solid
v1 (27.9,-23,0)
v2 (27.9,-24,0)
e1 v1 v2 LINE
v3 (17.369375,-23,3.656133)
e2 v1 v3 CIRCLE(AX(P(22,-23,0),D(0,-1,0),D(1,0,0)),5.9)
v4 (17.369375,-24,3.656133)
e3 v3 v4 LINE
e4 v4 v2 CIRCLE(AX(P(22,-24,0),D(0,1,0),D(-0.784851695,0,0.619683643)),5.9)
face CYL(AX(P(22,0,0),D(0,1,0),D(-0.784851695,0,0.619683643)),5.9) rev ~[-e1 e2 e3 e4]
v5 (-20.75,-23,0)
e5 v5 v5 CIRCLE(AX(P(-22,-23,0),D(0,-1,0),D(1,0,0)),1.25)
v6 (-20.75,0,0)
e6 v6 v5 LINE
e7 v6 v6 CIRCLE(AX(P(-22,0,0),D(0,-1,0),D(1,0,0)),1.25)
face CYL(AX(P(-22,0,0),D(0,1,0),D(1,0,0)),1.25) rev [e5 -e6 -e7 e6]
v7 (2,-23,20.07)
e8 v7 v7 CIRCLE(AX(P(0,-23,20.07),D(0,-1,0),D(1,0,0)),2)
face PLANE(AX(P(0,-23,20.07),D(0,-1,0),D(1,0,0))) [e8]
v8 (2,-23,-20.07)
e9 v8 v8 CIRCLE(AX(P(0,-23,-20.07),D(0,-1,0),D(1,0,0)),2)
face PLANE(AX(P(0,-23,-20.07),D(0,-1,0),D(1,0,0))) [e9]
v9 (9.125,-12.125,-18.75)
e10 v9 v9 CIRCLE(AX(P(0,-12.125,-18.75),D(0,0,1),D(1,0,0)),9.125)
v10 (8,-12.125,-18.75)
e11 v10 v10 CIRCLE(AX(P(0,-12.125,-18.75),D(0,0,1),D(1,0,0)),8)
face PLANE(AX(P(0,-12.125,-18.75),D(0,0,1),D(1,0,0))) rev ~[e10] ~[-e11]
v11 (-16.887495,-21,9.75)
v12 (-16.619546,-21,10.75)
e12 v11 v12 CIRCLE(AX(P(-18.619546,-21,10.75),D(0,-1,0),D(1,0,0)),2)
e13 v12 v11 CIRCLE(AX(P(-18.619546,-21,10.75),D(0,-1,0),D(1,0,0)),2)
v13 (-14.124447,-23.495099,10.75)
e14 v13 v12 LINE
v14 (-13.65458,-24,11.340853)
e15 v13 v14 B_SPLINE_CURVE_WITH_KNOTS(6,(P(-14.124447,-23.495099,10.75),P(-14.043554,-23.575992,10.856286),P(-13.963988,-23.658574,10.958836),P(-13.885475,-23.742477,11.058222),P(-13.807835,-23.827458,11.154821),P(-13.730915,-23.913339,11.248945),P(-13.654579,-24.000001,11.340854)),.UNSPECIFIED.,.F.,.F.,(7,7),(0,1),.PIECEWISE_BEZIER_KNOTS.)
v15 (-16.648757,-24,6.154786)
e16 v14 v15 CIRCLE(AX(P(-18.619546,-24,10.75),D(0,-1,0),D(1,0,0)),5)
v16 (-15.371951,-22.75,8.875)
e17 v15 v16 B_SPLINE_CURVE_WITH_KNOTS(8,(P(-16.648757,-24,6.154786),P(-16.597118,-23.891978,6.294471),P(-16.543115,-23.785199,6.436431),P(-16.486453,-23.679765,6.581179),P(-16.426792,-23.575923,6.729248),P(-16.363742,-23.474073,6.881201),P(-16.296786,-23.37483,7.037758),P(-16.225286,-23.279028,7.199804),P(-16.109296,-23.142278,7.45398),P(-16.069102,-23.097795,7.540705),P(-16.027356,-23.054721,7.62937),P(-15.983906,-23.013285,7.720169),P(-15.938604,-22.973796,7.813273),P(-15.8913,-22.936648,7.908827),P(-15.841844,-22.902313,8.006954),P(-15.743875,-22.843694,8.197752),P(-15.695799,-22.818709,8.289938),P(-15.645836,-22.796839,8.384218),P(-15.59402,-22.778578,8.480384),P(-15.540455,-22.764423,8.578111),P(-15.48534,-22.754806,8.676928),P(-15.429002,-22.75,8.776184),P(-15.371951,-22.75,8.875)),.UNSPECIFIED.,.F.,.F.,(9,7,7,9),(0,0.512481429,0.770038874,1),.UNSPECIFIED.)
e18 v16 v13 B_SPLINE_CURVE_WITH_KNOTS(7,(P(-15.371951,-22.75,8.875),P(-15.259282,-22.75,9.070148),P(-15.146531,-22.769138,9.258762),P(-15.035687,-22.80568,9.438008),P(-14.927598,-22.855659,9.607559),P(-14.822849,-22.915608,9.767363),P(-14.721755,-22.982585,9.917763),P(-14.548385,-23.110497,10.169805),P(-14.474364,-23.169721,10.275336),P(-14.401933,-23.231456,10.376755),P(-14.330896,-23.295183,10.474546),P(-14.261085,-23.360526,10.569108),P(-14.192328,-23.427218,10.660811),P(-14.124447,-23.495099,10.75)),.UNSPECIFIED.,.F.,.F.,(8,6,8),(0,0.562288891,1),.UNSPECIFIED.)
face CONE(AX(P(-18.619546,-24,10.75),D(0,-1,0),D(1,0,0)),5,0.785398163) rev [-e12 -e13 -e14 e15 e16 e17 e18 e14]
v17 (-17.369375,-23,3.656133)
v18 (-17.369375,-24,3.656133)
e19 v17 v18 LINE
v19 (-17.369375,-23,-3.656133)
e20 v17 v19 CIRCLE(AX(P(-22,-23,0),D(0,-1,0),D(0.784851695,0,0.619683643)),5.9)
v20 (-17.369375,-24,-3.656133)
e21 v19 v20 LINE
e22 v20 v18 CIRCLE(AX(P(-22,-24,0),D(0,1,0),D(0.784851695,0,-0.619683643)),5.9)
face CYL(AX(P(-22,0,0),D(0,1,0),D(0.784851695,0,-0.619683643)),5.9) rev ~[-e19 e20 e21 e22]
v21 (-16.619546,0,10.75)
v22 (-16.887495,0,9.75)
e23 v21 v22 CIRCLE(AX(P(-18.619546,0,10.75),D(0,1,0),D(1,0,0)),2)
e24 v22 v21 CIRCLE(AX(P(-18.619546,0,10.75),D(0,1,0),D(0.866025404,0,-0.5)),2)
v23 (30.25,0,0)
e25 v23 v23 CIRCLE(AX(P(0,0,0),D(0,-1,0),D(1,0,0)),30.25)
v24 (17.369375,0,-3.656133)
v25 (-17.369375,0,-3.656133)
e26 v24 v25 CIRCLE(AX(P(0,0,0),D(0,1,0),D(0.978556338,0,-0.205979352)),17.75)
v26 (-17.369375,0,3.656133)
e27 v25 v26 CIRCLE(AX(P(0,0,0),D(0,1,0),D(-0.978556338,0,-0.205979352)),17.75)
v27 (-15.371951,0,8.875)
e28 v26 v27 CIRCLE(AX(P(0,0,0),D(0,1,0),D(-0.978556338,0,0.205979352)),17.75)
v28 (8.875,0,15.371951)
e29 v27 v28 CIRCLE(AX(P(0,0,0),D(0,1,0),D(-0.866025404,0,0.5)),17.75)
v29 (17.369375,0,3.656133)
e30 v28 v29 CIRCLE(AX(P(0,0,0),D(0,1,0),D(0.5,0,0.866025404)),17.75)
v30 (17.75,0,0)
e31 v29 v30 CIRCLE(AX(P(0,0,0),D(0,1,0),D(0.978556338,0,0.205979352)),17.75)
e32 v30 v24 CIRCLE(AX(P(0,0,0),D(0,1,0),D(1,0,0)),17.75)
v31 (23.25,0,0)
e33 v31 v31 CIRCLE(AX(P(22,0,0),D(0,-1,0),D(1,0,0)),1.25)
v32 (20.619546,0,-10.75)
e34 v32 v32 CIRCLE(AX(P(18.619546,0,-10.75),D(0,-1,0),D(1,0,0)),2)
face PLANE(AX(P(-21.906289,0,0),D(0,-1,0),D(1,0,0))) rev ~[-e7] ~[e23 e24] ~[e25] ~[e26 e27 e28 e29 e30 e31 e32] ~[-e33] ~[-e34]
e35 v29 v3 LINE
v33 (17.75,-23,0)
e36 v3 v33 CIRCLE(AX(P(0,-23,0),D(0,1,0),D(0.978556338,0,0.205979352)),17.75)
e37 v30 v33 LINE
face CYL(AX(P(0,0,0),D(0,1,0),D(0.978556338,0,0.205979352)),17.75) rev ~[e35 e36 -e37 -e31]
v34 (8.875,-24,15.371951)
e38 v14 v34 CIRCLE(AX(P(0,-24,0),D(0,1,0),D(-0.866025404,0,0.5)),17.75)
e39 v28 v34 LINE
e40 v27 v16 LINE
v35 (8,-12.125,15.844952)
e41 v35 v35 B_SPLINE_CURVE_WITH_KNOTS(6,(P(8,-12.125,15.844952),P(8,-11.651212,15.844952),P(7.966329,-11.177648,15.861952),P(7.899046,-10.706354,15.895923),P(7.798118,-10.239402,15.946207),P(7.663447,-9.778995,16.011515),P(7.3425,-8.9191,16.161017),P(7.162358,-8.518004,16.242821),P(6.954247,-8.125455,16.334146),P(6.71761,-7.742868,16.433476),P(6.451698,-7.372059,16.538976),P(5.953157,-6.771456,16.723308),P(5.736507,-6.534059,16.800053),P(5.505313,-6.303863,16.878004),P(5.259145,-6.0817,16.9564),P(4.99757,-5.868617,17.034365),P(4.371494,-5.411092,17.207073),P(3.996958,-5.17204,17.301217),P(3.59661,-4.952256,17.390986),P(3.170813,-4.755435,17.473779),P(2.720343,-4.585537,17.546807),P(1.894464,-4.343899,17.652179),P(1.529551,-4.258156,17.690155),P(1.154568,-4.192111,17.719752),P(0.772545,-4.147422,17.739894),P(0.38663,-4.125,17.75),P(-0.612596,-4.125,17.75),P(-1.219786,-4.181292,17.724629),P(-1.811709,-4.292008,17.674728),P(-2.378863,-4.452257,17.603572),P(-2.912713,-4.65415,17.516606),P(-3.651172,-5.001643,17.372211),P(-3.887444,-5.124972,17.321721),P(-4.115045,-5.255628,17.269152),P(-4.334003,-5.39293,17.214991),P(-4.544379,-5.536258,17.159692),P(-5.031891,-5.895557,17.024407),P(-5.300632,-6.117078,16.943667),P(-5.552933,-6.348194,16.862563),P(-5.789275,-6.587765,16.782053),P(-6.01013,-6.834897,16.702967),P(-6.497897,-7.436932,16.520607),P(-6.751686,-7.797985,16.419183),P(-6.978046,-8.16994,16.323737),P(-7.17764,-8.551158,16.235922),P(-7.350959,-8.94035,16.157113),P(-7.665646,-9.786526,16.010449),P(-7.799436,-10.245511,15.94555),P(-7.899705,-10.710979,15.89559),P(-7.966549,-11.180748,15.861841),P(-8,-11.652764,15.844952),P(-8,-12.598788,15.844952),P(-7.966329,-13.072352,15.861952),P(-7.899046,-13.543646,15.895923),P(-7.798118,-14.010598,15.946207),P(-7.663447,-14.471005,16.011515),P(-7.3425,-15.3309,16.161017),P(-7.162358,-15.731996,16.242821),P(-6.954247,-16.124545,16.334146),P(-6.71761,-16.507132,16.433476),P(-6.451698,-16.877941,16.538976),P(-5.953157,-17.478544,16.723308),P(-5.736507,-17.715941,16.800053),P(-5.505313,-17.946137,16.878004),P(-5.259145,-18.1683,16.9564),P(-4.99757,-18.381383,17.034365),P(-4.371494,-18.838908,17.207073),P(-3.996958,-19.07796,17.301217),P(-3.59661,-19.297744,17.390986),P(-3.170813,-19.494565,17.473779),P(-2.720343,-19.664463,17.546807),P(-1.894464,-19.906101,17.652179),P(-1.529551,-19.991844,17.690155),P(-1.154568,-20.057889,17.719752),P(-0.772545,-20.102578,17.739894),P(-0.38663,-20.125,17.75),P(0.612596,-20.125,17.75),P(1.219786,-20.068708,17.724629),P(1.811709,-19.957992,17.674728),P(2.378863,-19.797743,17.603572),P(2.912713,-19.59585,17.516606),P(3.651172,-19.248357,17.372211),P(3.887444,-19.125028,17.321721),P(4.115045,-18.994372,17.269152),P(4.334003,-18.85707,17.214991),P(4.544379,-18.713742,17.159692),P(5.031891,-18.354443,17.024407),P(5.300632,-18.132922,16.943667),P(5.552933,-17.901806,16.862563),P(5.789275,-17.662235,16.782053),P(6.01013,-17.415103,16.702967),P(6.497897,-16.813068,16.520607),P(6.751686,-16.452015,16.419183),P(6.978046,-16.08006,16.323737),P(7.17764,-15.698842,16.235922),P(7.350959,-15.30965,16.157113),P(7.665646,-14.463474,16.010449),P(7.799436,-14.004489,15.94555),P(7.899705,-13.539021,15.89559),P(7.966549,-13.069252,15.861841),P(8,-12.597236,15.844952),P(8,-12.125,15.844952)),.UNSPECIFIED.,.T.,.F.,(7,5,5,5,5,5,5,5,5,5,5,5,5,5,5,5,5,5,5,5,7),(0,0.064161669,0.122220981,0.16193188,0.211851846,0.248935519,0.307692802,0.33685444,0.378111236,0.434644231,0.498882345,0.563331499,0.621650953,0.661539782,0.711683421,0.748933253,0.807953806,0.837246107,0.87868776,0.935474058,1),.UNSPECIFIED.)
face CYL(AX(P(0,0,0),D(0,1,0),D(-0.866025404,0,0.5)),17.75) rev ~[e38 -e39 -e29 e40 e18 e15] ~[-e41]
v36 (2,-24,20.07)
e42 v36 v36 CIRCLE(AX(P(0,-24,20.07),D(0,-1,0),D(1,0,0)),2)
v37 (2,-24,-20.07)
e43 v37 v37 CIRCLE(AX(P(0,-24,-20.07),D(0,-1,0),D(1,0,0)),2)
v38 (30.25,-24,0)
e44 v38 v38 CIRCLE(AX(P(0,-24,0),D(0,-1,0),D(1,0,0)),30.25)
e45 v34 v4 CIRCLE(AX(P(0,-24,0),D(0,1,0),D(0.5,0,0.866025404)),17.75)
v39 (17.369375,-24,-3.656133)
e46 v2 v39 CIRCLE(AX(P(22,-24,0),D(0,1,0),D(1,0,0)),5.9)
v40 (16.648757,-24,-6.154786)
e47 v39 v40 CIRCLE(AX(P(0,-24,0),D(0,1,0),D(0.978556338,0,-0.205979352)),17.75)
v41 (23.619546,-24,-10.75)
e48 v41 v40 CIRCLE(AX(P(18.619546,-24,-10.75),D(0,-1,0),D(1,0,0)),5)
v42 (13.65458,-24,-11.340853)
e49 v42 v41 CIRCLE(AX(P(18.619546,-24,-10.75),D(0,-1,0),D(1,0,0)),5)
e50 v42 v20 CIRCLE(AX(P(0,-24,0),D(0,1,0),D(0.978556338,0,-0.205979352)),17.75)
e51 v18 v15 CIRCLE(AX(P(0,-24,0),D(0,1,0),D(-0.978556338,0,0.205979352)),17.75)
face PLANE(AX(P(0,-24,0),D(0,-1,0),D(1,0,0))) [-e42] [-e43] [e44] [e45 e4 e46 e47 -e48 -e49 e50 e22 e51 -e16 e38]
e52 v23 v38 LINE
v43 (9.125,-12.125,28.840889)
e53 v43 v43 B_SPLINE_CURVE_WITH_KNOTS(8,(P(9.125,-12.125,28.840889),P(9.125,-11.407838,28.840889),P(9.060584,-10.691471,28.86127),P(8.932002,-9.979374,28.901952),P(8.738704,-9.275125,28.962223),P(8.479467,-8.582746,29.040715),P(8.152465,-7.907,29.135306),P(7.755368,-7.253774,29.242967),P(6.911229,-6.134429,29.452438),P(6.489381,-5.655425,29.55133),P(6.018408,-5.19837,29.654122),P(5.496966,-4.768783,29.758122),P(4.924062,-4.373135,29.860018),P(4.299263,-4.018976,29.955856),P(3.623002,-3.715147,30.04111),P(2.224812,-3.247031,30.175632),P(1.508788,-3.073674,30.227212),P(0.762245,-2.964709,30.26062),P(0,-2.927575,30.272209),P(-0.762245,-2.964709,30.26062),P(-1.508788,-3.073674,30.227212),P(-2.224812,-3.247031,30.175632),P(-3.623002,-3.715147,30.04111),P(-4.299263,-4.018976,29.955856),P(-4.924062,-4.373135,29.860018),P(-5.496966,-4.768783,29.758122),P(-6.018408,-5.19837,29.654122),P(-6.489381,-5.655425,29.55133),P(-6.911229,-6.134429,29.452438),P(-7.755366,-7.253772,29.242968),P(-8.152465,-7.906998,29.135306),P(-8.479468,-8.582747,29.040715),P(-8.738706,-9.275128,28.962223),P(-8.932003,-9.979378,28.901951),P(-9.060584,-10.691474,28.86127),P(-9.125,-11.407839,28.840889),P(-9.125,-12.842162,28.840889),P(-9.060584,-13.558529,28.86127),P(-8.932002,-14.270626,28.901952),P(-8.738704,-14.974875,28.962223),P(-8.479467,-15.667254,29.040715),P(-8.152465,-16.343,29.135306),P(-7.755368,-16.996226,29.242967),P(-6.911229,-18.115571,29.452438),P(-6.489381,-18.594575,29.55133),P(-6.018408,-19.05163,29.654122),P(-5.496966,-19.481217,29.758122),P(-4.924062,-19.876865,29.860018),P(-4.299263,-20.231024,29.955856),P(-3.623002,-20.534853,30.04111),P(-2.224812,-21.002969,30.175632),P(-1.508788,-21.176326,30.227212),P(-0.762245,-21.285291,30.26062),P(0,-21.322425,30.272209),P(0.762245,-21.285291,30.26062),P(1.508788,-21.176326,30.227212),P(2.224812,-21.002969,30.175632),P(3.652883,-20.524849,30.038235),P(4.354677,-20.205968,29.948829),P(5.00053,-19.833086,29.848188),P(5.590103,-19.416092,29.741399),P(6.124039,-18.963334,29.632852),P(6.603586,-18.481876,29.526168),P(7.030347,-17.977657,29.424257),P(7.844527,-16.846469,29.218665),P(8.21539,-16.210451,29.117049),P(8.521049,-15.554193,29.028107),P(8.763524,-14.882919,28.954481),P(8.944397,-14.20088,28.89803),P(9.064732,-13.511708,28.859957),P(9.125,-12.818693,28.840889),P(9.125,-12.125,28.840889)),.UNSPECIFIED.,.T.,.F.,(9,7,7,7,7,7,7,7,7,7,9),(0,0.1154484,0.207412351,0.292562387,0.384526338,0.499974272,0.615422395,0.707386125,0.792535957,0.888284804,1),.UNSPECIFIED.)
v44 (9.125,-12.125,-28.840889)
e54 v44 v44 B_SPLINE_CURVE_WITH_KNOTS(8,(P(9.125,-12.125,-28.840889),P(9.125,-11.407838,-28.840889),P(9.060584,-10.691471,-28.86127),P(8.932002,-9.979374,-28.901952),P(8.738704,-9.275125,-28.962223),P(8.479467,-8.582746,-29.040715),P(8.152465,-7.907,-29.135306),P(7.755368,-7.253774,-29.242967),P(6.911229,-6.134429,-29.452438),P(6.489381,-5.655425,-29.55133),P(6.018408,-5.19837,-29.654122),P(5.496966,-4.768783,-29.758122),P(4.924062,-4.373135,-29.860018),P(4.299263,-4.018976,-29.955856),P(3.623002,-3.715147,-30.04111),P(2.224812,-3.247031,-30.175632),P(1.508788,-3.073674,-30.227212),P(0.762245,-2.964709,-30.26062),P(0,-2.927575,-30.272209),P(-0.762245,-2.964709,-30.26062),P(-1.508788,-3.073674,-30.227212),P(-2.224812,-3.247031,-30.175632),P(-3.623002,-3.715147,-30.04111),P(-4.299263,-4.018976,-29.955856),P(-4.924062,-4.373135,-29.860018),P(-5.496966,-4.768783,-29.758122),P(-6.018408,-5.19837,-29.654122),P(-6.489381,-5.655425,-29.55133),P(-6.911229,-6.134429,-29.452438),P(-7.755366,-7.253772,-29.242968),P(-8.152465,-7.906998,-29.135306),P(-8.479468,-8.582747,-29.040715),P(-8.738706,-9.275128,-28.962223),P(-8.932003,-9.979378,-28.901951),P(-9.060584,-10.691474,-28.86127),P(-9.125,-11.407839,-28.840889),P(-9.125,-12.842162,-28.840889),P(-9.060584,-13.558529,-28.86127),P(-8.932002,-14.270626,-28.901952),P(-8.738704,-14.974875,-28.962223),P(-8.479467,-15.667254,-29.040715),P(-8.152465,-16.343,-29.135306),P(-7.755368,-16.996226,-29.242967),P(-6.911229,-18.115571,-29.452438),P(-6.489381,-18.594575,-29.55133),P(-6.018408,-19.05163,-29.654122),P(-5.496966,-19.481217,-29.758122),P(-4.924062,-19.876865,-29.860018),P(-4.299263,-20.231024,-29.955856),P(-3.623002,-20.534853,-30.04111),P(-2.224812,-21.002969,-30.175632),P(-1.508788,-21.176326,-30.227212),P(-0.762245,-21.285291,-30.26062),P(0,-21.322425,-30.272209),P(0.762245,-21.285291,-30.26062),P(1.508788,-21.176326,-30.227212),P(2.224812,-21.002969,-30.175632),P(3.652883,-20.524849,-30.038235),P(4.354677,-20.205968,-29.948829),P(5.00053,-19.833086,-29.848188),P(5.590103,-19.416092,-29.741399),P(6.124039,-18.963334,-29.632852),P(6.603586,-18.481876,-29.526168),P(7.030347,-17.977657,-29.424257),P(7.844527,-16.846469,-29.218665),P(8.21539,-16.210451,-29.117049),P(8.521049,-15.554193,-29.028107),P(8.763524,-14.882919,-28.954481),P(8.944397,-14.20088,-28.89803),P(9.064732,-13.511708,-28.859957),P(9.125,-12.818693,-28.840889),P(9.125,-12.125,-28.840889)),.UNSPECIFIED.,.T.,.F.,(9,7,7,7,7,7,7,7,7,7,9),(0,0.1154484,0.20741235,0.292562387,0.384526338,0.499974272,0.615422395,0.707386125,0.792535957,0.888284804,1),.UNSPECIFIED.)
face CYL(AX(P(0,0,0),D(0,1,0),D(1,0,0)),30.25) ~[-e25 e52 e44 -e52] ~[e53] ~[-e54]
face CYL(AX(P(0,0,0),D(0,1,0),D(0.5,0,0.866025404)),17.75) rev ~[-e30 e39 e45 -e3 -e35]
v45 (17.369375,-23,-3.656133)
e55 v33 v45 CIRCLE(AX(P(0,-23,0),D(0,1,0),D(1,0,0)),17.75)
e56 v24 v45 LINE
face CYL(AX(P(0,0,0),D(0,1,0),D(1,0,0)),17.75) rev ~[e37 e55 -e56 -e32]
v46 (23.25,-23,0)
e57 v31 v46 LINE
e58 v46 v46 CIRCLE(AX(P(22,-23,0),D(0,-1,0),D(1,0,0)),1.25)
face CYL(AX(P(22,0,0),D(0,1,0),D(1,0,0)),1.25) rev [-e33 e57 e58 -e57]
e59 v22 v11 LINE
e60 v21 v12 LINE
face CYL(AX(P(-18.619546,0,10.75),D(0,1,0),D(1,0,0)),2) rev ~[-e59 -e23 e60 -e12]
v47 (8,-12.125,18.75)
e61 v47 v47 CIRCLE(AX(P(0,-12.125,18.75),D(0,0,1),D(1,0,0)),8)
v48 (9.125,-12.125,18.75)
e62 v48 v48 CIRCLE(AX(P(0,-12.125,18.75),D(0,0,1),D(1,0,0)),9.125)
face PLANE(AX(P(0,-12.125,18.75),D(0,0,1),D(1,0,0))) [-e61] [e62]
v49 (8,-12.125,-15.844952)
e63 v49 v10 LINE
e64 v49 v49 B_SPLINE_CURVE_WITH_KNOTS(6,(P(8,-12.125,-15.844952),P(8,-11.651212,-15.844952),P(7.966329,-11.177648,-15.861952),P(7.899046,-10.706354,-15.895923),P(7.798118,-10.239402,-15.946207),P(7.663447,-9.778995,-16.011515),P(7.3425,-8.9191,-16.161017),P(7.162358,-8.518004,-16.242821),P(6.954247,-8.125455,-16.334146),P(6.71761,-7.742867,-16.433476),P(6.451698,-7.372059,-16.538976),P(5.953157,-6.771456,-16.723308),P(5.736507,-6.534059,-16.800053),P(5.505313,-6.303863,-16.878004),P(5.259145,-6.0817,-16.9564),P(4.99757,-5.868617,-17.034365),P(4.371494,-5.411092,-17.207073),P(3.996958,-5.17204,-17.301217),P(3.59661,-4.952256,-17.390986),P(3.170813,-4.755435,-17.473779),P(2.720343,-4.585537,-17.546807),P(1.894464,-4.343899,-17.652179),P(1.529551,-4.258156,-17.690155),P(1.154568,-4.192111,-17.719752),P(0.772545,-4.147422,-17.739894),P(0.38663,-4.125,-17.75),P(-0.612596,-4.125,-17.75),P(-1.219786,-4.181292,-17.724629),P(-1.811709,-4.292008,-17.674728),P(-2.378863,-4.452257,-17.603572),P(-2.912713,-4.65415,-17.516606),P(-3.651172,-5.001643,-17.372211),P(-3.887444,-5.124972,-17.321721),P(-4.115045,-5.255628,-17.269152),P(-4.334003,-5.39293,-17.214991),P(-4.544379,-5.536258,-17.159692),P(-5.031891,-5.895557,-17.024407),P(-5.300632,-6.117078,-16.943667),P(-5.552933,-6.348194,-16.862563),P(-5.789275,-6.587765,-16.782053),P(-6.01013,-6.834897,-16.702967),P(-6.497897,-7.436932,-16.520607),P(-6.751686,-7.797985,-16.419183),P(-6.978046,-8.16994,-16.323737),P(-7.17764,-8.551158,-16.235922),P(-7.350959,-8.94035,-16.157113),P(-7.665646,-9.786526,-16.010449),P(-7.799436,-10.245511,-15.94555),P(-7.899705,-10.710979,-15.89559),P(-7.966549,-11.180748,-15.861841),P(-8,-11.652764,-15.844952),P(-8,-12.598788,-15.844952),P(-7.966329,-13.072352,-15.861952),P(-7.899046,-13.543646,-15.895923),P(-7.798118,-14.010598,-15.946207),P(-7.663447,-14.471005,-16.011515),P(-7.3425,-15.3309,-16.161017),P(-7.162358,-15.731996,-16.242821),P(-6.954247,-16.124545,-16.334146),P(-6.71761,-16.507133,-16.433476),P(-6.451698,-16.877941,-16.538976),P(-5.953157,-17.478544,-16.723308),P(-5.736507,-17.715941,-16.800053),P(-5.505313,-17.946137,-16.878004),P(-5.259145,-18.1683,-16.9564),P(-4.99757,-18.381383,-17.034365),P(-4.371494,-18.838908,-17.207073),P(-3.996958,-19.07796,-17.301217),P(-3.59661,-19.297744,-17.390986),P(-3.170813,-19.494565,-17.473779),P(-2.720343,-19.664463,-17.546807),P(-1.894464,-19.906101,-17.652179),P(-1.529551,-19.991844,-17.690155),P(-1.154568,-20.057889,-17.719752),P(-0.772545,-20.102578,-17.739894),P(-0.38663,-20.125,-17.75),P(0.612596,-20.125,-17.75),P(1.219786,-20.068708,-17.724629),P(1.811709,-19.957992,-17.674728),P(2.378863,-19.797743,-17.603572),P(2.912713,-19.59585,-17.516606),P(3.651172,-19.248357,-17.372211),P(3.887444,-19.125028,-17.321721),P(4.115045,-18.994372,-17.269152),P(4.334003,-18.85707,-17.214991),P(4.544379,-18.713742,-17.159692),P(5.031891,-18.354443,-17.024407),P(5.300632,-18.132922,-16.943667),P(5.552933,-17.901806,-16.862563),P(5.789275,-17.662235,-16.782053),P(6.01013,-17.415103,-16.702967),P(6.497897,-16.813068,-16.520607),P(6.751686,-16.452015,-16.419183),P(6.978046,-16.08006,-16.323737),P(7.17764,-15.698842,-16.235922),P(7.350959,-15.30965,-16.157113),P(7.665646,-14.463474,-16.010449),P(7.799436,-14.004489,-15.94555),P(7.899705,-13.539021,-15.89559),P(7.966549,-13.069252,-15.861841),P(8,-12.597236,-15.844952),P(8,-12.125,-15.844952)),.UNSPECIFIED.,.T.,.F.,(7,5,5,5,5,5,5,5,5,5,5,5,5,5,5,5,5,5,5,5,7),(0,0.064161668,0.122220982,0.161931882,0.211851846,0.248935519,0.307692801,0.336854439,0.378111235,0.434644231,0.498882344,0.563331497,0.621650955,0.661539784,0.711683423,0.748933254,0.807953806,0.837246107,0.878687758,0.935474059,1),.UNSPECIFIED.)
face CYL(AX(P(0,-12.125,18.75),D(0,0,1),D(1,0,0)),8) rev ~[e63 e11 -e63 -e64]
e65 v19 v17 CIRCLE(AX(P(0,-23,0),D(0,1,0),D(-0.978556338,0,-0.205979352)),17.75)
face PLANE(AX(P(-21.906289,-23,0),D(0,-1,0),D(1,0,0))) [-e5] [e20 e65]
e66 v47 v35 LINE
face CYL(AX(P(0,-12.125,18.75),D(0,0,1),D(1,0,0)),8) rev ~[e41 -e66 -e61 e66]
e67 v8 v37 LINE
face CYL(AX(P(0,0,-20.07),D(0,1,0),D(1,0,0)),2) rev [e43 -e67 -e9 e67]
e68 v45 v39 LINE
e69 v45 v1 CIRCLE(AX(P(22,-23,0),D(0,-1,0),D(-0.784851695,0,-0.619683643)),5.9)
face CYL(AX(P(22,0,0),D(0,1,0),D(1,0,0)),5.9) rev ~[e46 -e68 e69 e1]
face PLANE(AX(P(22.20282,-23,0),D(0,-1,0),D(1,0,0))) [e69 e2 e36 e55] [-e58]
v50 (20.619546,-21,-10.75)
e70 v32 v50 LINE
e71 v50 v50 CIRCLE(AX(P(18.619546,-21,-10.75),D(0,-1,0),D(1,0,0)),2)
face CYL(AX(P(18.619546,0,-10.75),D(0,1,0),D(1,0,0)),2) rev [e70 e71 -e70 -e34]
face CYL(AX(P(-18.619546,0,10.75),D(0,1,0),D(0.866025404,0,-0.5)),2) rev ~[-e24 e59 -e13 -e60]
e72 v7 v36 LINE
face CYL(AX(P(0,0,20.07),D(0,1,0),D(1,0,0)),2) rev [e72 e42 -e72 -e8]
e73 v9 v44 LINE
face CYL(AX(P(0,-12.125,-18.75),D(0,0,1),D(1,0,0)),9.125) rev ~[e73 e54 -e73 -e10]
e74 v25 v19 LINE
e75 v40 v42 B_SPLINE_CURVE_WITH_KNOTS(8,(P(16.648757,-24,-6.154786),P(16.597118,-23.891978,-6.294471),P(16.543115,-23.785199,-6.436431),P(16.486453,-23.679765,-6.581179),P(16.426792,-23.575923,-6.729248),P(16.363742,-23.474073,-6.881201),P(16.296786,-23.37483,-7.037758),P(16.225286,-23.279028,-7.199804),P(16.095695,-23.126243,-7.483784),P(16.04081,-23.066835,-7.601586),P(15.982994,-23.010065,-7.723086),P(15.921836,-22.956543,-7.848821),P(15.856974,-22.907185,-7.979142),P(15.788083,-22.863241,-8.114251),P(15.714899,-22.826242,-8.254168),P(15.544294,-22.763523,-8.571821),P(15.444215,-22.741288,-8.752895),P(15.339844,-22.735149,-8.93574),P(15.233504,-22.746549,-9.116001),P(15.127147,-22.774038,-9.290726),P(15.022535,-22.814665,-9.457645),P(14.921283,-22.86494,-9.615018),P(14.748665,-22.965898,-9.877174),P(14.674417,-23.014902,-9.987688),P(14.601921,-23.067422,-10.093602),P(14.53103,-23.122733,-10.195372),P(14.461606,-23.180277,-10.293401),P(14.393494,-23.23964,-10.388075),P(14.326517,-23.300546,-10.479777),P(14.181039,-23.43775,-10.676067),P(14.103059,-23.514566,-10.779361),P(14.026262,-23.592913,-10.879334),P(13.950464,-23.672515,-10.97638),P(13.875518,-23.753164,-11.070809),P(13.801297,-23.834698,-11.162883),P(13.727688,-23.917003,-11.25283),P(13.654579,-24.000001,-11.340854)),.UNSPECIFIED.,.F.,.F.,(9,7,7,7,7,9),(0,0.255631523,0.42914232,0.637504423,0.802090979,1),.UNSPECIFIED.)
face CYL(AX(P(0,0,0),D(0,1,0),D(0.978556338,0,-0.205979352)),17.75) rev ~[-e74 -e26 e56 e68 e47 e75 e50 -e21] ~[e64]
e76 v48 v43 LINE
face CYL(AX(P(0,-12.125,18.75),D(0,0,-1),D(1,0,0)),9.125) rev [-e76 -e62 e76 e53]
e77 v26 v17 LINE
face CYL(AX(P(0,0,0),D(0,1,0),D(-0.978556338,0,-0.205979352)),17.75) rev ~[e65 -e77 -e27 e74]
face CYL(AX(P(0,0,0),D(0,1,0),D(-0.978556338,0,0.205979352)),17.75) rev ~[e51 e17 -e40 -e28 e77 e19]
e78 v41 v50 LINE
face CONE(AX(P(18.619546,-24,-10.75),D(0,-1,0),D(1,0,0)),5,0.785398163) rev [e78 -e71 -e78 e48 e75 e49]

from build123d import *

# Parameters (mm, degrees)
F0_R          = 30.25
F0_R_2        = 2
F1_DEPTH      = 24
F0_R_3        = 1.25
F2_DEPTH      = 23
F5_R          = 9.125
F5_R_2        = 8
F6_DEPTH      = 25
F7_DEPTH      = 60
F7_DEPTH_BACK = 30
F8_START      = -37.5
F8_DEPTH      = 45.7


# Not quite as in the source:
# - a fillet or chamfer that OpenCascade refuses, or shapes differently, is made with other operations: its cross-section is extruded or revolved along the edge and cut away or added


with BuildPart() as f1:
    # F0 (on Front) → F1 (new body)
    with BuildSketch(Plane.XZ):
        Circle(F0_R)
        with Locations((0, -20.07)):
            Circle(F0_R_2, mode=Mode.SUBTRACT)
        with Locations((18.6195461814, -10.75)):
            Circle(F0_R_2, mode=Mode.SUBTRACT)
        with BuildLine():
            ThreePointArc((-16.6195461814, 10.75), (-16.6876945288, 10.2323619098), (-16.8874953738, 9.75))
            ThreePointArc((-16.8874953738, 9.75), (-20.5513978339, 11.2676380902), (-16.6195461814, 10.75))
        make_face(mode=Mode.SUBTRACT)
        with BuildLine():
            ThreePointArc((8.875, 15.3719509172), (14.3703479176, 10.4190019065), (17.369375, 3.6561334917))
            ThreePointArc((17.369375, 3.6561334917), (23.9351114309, 5.5736293158), (27.9, 0))
            ThreePointArc((27.9, 0), (23.9351114309, -5.5736293158), (17.369375, -3.6561334917))
            ThreePointArc((17.369375, -3.6561334917), (0, -17.75), (-17.369375, -3.6561334917))
            ThreePointArc((-17.369375, -3.6561334917), (-27.9, 0), (-17.369375, 3.6561334917))
            ThreePointArc((-17.369375, 3.6561334917), (-16.5773263107, 6.3446632999), (-15.3719509172, 8.875))
            ThreePointArc((-15.3719509172, 8.875), (-4.5940380506, 17.1451834166), (8.875, 15.3719509172))
        make_face(mode=Mode.SUBTRACT)
        with Locations((0, 20.07)):
            Circle(F0_R_2, mode=Mode.SUBTRACT)
    extrude(amount=F1_DEPTH)

    # F0 (on Front) → F2 (join)
    with BuildSketch(Plane.XZ):
        with BuildLine():
            ThreePointArc((-17.369375, 3.6561334917), (-27.9, 0), (-17.369375, -3.6561334917))
            ThreePointArc((-17.369375, -3.6561334917), (-17.75, 0), (-17.369375, 3.6561334917))
        make_face()
        with Locations((-22, 0)):
            Circle(F0_R_3, mode=Mode.SUBTRACT)
        with Locations((0, 20.07)):
            Circle(F0_R_2)
        with BuildLine():
            ThreePointArc((17.369375, 3.6561334917), (17.6545873111, 1.8379463744), (17.75, 0))
            ThreePointArc((17.75, 0), (17.6545873111, -1.8379463744), (17.369375, -3.6561334917))
            ThreePointArc((17.369375, -3.6561334917), (23.9351114309, -5.5736293158), (27.9, 0))
            ThreePointArc((27.9, 0), (23.9351114309, 5.5736293158), (17.369375, 3.6561334917))
        make_face()
        with Locations((22, 0)):
            Circle(F0_R_3, mode=Mode.SUBTRACT)
        with Locations((0, -20.07)):
            Circle(F0_R_2)
    extrude(amount=F2_DEPTH)

    # F3: chamfer of 3 on 2 edges, made by hand

    # F3_s1 → F3_t2 (revolve, cut)
    with BuildSketch(Plane.XY.offset(10.75)):
        Polygon((-13.6195461814, -24), (-16.6195461814, -21), (-16.6195461814, -24), align=None)
    revolve(axis=Axis((-18.6195461814, -24, 10.75), (0, -1, 0)), mode=Mode.SUBTRACT)

    # F3_s3 → F3_t4 (revolve, cut)
    with BuildSketch(Plane.XY.offset(-10.75)):
        Polygon((23.6195461814, -24), (20.6195461814, -21), (20.6195461814, -24), align=None)
    revolve(axis=Axis((18.6195461814, -24, -10.75), (0, -1, 0)), mode=Mode.SUBTRACT)

    # F5 (on offset) → F6 (cut)
    with BuildSketch(Plane.XY.offset(18.75)):
        with Locations((0, -12.125)):
            Circle(F5_R)
        with Locations((0, -12.125)):
            Circle(F5_R_2, mode=Mode.SUBTRACT)
    extrude(amount=F6_DEPTH, mode=Mode.SUBTRACT)

    # F5 (on offset) → F7 (cut, two sides)
    with BuildSketch(Plane.XY.offset(18.75)) as f7_sk:
        with Locations((0, -12.125)):
            Circle(F5_R_2)
    extrude(amount=-F7_DEPTH, mode=Mode.SUBTRACT)
    extrude(f7_sk.sketch, amount=F7_DEPTH_BACK, mode=Mode.SUBTRACT)

    # F5 (on offset) → F8 (cut)
    with BuildSketch(Plane.XY.offset(18.75).offset(F8_START)):
        with Locations((0, -12.125)):
            Circle(F5_R)
        with Locations((0, -12.125)):
            Circle(F5_R_2, mode=Mode.SUBTRACT)
    extrude(amount=-F8_DEPTH, mode=Mode.SUBTRACT)


solid = f1.part
